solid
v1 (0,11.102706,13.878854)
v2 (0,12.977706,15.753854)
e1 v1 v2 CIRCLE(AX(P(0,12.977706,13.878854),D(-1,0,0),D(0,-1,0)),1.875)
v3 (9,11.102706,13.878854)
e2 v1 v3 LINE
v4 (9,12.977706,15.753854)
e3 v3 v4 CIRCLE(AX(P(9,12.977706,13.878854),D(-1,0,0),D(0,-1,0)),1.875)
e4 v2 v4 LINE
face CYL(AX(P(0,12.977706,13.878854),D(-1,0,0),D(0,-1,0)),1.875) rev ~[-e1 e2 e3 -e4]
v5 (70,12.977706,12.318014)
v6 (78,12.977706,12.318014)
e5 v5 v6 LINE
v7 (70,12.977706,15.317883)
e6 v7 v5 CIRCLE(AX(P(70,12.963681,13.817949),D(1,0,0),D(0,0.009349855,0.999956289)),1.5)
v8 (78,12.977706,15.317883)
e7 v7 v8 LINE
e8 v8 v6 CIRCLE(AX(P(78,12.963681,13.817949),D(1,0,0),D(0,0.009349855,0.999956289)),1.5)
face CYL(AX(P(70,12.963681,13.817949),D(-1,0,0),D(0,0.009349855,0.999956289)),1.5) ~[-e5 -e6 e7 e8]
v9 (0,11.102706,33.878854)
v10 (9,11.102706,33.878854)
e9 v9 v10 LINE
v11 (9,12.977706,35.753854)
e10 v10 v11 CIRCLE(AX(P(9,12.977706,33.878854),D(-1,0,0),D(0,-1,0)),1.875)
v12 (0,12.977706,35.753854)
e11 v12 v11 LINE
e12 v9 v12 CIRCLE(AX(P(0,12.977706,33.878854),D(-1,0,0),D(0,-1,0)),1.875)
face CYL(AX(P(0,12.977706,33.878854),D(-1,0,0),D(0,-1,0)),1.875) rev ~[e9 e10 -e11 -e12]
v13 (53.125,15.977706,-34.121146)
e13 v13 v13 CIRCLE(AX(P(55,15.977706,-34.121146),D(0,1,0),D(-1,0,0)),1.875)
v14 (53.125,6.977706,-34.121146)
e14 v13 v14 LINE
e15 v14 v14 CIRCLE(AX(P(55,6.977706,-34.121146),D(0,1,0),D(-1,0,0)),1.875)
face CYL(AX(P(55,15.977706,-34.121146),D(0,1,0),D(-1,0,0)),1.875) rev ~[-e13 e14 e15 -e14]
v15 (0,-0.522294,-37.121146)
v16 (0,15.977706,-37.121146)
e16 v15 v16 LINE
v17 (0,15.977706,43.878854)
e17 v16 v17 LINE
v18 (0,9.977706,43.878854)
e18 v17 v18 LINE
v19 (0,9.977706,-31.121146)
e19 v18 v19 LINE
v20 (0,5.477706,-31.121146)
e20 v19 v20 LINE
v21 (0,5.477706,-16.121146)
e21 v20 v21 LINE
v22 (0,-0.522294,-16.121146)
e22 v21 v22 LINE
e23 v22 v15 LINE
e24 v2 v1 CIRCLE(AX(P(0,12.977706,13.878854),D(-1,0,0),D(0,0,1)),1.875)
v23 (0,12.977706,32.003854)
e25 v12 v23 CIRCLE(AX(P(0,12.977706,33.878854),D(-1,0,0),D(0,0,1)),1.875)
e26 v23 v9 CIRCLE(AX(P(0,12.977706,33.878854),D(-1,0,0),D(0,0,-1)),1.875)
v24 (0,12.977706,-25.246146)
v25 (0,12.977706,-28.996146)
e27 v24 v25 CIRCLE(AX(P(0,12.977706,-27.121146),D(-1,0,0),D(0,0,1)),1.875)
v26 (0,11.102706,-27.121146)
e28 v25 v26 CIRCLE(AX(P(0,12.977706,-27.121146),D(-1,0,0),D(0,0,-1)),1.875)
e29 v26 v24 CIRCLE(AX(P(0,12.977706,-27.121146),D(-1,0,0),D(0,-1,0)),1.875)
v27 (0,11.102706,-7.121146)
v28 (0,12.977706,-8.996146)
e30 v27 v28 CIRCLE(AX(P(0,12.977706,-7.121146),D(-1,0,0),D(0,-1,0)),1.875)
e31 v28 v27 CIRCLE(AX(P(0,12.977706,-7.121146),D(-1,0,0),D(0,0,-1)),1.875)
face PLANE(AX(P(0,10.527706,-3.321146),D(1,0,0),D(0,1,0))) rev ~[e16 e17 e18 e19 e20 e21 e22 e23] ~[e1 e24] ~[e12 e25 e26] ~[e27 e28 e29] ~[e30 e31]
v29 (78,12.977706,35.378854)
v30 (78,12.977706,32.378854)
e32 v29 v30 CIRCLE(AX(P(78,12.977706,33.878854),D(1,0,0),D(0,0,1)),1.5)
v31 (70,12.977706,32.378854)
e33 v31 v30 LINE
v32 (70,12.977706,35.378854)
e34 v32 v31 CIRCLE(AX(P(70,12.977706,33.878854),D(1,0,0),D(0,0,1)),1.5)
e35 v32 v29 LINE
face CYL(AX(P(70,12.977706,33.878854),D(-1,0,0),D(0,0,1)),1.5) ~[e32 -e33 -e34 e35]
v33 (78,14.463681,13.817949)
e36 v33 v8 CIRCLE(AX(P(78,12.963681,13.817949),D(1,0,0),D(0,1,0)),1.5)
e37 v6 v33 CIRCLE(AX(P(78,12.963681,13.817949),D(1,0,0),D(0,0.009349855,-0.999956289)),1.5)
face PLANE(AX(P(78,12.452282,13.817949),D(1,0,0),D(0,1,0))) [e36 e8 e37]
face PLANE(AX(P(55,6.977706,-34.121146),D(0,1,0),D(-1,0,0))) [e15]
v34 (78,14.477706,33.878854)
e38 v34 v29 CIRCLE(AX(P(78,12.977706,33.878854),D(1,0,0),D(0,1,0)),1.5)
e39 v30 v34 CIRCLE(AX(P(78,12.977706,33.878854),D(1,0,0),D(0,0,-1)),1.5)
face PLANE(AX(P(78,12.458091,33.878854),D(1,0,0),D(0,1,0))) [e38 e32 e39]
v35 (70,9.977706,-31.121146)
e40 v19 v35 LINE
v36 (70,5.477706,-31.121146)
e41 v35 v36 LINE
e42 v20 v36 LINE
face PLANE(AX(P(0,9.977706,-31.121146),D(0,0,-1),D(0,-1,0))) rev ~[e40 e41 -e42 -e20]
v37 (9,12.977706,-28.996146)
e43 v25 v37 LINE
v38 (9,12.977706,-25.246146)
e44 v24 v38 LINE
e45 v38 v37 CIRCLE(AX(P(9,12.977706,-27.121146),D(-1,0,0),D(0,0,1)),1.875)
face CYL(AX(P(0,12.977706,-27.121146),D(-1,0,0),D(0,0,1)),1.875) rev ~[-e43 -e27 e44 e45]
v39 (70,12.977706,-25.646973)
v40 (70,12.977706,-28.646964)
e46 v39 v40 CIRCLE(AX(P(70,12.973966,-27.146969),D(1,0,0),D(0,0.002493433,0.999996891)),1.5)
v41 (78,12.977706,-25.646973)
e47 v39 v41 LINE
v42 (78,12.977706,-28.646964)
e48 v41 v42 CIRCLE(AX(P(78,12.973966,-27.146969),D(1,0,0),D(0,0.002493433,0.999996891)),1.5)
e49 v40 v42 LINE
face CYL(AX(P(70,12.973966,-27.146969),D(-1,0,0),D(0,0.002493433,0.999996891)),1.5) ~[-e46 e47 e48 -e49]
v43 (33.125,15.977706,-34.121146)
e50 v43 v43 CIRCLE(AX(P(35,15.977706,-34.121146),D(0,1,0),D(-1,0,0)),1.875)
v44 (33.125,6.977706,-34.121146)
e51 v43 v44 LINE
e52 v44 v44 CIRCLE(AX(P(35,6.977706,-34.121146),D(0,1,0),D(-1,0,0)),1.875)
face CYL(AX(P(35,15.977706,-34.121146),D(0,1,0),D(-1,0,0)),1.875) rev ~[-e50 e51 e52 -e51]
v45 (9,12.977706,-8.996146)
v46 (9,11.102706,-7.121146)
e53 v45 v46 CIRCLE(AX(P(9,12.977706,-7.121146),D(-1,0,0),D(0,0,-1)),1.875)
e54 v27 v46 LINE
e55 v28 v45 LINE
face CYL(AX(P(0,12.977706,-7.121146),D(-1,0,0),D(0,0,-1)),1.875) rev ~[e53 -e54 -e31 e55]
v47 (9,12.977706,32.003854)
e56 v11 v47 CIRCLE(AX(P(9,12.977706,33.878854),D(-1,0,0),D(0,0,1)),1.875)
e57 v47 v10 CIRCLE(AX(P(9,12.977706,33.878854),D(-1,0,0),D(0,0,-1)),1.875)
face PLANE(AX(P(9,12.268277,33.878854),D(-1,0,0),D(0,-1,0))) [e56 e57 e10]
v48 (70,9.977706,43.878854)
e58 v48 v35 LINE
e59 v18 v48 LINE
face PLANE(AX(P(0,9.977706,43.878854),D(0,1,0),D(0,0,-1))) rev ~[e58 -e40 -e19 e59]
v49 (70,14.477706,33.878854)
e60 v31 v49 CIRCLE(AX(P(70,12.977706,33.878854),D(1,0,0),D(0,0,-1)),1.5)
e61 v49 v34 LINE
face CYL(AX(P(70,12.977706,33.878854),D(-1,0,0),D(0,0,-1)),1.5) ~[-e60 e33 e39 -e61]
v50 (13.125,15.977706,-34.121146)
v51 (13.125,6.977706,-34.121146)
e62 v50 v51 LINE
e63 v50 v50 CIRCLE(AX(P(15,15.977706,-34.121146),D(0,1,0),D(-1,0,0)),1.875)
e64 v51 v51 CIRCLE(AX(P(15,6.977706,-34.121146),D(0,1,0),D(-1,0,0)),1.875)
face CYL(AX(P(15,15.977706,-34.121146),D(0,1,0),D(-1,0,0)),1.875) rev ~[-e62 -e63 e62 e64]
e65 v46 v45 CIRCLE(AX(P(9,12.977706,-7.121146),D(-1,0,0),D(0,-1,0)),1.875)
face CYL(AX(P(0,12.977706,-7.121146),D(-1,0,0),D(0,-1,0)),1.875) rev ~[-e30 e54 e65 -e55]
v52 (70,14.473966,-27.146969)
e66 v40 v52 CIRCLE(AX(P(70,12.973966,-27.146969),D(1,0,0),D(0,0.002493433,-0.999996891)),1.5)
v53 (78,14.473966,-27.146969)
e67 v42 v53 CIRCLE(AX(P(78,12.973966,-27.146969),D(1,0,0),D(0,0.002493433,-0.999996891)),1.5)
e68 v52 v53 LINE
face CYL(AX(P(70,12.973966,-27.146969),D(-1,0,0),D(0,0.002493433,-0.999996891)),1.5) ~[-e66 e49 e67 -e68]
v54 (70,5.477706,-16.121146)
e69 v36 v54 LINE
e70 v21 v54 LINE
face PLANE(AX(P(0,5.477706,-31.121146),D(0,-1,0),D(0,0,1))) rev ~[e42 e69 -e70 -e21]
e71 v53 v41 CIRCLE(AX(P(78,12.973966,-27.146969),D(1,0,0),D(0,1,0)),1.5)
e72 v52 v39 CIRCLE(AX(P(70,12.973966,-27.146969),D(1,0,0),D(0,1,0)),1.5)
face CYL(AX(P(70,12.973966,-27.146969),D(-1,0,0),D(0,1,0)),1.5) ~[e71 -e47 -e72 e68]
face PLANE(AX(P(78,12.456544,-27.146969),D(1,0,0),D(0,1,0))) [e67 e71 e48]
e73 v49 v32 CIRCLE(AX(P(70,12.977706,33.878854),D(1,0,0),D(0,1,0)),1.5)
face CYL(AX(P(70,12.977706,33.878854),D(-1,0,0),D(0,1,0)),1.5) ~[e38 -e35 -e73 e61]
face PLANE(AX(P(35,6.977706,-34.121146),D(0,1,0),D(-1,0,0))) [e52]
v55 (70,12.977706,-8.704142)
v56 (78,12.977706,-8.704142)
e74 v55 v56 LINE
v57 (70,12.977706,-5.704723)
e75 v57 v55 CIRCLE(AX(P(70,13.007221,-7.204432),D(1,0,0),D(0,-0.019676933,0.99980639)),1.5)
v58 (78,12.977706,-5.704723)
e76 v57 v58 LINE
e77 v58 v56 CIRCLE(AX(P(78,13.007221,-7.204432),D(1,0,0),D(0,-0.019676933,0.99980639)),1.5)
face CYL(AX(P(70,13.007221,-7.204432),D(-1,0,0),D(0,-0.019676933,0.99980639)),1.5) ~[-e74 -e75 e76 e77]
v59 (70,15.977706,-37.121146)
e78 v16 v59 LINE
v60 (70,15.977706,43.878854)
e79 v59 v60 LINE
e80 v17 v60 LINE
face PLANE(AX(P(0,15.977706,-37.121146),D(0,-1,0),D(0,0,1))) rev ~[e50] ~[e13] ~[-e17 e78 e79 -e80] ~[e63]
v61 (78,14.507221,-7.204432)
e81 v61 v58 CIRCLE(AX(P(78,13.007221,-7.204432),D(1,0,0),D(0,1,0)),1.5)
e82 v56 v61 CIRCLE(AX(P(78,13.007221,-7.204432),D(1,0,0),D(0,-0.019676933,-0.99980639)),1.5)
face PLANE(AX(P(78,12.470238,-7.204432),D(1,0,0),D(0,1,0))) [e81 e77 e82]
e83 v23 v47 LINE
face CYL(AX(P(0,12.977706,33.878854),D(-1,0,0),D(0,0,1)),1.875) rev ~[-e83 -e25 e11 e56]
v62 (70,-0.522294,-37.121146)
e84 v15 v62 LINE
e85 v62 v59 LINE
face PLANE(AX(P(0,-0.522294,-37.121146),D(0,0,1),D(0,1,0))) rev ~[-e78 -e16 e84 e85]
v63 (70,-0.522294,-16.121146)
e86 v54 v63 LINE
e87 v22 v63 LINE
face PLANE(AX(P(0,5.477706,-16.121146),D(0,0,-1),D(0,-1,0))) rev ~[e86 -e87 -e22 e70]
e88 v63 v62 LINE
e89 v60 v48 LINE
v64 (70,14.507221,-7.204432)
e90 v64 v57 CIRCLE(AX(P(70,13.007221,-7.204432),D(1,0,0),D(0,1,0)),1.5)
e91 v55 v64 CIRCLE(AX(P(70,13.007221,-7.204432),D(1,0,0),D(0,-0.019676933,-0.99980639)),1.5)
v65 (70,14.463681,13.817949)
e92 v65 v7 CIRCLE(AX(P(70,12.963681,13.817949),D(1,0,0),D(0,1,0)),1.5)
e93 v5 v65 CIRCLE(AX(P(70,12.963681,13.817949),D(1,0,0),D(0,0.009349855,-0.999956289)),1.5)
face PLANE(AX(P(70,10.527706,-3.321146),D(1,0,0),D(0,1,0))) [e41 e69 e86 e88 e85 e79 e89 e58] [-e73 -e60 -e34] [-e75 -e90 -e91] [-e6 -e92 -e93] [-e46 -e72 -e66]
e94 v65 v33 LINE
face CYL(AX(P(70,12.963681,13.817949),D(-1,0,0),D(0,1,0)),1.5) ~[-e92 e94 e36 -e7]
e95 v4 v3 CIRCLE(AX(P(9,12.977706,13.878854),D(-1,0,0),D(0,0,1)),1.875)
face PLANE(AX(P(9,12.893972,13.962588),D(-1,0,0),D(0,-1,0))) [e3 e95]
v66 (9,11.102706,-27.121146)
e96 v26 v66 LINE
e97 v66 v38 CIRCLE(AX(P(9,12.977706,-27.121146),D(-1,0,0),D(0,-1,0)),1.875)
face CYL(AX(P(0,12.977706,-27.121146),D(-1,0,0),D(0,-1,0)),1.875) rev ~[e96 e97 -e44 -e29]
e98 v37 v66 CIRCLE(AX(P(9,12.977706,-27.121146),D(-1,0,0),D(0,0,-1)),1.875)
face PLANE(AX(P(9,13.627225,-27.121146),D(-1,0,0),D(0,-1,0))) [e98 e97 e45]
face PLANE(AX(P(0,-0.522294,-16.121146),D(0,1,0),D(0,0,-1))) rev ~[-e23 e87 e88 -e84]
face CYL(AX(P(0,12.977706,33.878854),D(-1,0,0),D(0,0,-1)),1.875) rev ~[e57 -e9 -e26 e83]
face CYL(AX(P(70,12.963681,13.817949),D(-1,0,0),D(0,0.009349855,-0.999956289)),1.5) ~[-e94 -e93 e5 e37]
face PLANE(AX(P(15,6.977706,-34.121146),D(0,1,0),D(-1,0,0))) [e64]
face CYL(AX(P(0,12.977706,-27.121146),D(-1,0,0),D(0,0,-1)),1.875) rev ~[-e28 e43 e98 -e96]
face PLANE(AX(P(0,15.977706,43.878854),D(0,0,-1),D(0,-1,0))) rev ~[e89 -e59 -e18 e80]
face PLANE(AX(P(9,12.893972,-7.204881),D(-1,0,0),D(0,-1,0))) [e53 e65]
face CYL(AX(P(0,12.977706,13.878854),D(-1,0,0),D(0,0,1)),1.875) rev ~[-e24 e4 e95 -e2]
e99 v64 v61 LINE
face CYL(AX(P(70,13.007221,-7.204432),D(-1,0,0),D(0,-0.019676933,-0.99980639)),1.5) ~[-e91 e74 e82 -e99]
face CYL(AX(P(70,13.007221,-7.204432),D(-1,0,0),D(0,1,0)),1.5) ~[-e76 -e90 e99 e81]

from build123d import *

# Parameters (mm, degrees)
F1_DEPTH = 70
F3_DEPTH = 8
F5_DEPTH = 9
F6_R     = 1.875
F7_DEPTH = 9


# Not quite as in the source:
# - a feature names something its author has since deleted; it is built from what else it names


with BuildPart() as f1:
    # F0 (on Right) → F1 (new body)
    with BuildSketch(Plane.YZ):
        Polygon((15.9777059274, -37.1211464703), (15.9777059274, 43.8788535297), (9.9777059274, 43.8788535297), (9.9777059274, -31.1211464703), (5.4777059274, -31.1211464703), (5.4777059274, -16.1211464703), (-0.5222940726, -16.1211464703), (-0.5222940726, -37.1211464703), align=None)
    extrude(amount=F1_DEPTH)

    # F2 (on face) → F3 (join)
    with BuildSketch(Plane.YZ.offset(70)):
        with BuildLine():
            Line((12.9777059274, 33.8788535297), (12.9777059274, 35.3788535297))
            ThreePointArc((12.9777059274, 35.3788535297), (11.4777059274, 33.8788535297), (12.9777059274, 32.3788535297))
            Line((12.9777059274, 32.3788535297), (12.9777059274, 33.8788535297))
        make_face()
        with BuildLine():
            ThreePointArc((12.9777059274, 32.3788535297), (14.0383660992, 32.8181933579), (14.4777059274, 33.8788535297))
            ThreePointArc((14.4777059274, 33.8788535297), (14.0383660992, 34.9395137015), (12.9777059274, 35.3788535297))
            Line((12.9777059274, 35.3788535297), (12.9777059274, 33.8788535297))
            Line((12.9777059274, 33.8788535297), (12.9777059274, 32.3788535297))
        make_face()
        with BuildLine():
            Line((12.9777059274, 13.8788535297), (12.9777059274, 15.3178830066))
            ThreePointArc((12.9777059274, 15.3178830066), (11.4636811456, 13.8179485729), (12.9777059274, 12.3180141391))
            Line((12.9777059274, 12.3180141391), (12.9777059274, 13.8788535297))
        make_face()
        with BuildLine():
            ThreePointArc((14.4636811456, 13.8179485729), (14.0292882901, 14.8736385906), (12.9777059274, 15.3178830066))
            Line((12.9777059274, 15.3178830066), (12.9777059274, 13.8788535297))
            Line((12.9777059274, 13.8788535297), (12.9777059274, 12.3180141391))
            ThreePointArc((12.9777059274, 12.3180141391), (14.0292882901, 12.7622585551), (14.4636811456, 13.8179485729))
        make_face()
        with BuildLine():
            Line((12.9777059274, -7.1211464703), (12.9777059274, -5.7047228841))
            ThreePointArc((12.9777059274, -5.7047228841), (11.5072213267, -7.2044324698), (12.9777059274, -8.7041420554))
            Line((12.9777059274, -8.7041420554), (12.9777059274, -7.1211464703))
        make_face()
        with BuildLine():
            ThreePointArc((14.5072213267, -7.2044324698), (14.0573943841, -6.1333878631), (12.9777059274, -5.7047228841))
            Line((12.9777059274, -5.7047228841), (12.9777059274, -7.1211464703))
            Line((12.9777059274, -7.1211464703), (12.9777059274, -8.7041420554))
            ThreePointArc((12.9777059274, -8.7041420554), (14.0573943841, -8.2754770764), (14.5072213267, -7.2044324698))
        make_face()
        with BuildLine():
            ThreePointArc((12.9777059274, -25.6469734003), (11.473965778, -27.1469687374), (12.9777059274, -28.6469640745))
            Line((12.9777059274, -28.6469640745), (12.9777059274, -27.1211464703))
            Line((12.9777059274, -27.1211464703), (12.9777059274, -25.6469734003))
        make_face()
        with BuildLine():
            Line((12.9777059274, -27.1211464703), (12.9777059274, -28.6469640745))
            ThreePointArc((12.9777059274, -28.6469640745), (14.035947469, -28.2063057413), (14.473965778, -27.1469687374))
            ThreePointArc((14.473965778, -27.1469687374), (14.035947469, -26.0876317334), (12.9777059274, -25.6469734003))
            Line((12.9777059274, -25.6469734003), (12.9777059274, -27.1211464703))
        make_face()
    extrude(amount=F3_DEPTH)

    # F4 (on face) → F5 (cut)
    with BuildSketch(Plane(origin=(0, 0, 0), x_dir=(0, -1, 0), z_dir=(-1, 0, 0))):
        with BuildLine():
            ThreePointArc((-12.9777059274, 32.0038535297), (-11.6518807127, 32.553028315), (-11.1027059274, 33.8788535297))
            ThreePointArc((-11.1027059274, 33.8788535297), (-11.6518807127, 35.2046787444), (-12.9777059274, 35.7538535297))
            Line((-12.9777059274, 35.7538535297), (-12.9777059274, 33.8788535297))
            Line((-12.9777059274, 33.8788535297), (-12.9777059274, 32.0038535297))
        make_face()
        with BuildLine():
            Line((-12.9777059274, 33.8788535297), (-12.9777059274, 35.7538535297))
            ThreePointArc((-12.9777059274, 35.7538535297), (-14.8527059274, 33.8788535297), (-12.9777059274, 32.0038535297))
            Line((-12.9777059274, 32.0038535297), (-12.9777059274, 33.8788535297))
        make_face()
        with BuildLine():
            ThreePointArc((-11.1027059274, 13.8788535297), (-11.6518807127, 15.2046787444), (-12.9777059274, 15.7538535297))
            ThreePointArc((-12.9777059274, 15.7538535297), (-14.3035311422, 12.553028315), (-11.1027059274, 13.8788535297))
        make_face()
        with BuildLine():
            ThreePointArc((-11.1027059274, -7.1211464703), (-14.3035311422, -5.7953212556), (-12.9777059274, -8.9961464703))
            ThreePointArc((-12.9777059274, -8.9961464703), (-11.6518807127, -8.446971685), (-11.1027059274, -7.1211464703))
        make_face()
        with BuildLine():
            ThreePointArc((-12.9777059274, -25.2461464703), (-14.8527059274, -27.1211464703), (-12.9777059274, -28.9961464703))
            Line((-12.9777059274, -28.9961464703), (-12.9777059274, -27.1211464703))
            Line((-12.9777059274, -27.1211464703), (-12.9777059274, -25.2461464703))
        make_face()
        with BuildLine():
            Line((-12.9777059274, -27.1211464703), (-12.9777059274, -28.9961464703))
            ThreePointArc((-12.9777059274, -28.9961464703), (-11.6518807127, -28.446971685), (-11.1027059274, -27.1211464703))
            ThreePointArc((-11.1027059274, -27.1211464703), (-11.6518807127, -25.7953212556), (-12.9777059274, -25.2461464703))
            Line((-12.9777059274, -25.2461464703), (-12.9777059274, -27.1211464703))
        make_face()
    extrude(amount=-F5_DEPTH, mode=Mode.SUBTRACT)

    # F6 (on face) → F7 (cut)
    with BuildSketch(Plane(origin=(0, 15.9777059274, 0), x_dir=(-1, 0, 0), z_dir=(0, 1, 0))):
        with Locations((-55, -34.1211464703)):
            Circle(F6_R)
        with Locations((-35, -34.1211464703)):
            Circle(F6_R)
        with Locations((-15, -34.1211464703)):
            Circle(F6_R)
    extrude(amount=-F7_DEPTH, mode=Mode.SUBTRACT)


solid = f1.part
